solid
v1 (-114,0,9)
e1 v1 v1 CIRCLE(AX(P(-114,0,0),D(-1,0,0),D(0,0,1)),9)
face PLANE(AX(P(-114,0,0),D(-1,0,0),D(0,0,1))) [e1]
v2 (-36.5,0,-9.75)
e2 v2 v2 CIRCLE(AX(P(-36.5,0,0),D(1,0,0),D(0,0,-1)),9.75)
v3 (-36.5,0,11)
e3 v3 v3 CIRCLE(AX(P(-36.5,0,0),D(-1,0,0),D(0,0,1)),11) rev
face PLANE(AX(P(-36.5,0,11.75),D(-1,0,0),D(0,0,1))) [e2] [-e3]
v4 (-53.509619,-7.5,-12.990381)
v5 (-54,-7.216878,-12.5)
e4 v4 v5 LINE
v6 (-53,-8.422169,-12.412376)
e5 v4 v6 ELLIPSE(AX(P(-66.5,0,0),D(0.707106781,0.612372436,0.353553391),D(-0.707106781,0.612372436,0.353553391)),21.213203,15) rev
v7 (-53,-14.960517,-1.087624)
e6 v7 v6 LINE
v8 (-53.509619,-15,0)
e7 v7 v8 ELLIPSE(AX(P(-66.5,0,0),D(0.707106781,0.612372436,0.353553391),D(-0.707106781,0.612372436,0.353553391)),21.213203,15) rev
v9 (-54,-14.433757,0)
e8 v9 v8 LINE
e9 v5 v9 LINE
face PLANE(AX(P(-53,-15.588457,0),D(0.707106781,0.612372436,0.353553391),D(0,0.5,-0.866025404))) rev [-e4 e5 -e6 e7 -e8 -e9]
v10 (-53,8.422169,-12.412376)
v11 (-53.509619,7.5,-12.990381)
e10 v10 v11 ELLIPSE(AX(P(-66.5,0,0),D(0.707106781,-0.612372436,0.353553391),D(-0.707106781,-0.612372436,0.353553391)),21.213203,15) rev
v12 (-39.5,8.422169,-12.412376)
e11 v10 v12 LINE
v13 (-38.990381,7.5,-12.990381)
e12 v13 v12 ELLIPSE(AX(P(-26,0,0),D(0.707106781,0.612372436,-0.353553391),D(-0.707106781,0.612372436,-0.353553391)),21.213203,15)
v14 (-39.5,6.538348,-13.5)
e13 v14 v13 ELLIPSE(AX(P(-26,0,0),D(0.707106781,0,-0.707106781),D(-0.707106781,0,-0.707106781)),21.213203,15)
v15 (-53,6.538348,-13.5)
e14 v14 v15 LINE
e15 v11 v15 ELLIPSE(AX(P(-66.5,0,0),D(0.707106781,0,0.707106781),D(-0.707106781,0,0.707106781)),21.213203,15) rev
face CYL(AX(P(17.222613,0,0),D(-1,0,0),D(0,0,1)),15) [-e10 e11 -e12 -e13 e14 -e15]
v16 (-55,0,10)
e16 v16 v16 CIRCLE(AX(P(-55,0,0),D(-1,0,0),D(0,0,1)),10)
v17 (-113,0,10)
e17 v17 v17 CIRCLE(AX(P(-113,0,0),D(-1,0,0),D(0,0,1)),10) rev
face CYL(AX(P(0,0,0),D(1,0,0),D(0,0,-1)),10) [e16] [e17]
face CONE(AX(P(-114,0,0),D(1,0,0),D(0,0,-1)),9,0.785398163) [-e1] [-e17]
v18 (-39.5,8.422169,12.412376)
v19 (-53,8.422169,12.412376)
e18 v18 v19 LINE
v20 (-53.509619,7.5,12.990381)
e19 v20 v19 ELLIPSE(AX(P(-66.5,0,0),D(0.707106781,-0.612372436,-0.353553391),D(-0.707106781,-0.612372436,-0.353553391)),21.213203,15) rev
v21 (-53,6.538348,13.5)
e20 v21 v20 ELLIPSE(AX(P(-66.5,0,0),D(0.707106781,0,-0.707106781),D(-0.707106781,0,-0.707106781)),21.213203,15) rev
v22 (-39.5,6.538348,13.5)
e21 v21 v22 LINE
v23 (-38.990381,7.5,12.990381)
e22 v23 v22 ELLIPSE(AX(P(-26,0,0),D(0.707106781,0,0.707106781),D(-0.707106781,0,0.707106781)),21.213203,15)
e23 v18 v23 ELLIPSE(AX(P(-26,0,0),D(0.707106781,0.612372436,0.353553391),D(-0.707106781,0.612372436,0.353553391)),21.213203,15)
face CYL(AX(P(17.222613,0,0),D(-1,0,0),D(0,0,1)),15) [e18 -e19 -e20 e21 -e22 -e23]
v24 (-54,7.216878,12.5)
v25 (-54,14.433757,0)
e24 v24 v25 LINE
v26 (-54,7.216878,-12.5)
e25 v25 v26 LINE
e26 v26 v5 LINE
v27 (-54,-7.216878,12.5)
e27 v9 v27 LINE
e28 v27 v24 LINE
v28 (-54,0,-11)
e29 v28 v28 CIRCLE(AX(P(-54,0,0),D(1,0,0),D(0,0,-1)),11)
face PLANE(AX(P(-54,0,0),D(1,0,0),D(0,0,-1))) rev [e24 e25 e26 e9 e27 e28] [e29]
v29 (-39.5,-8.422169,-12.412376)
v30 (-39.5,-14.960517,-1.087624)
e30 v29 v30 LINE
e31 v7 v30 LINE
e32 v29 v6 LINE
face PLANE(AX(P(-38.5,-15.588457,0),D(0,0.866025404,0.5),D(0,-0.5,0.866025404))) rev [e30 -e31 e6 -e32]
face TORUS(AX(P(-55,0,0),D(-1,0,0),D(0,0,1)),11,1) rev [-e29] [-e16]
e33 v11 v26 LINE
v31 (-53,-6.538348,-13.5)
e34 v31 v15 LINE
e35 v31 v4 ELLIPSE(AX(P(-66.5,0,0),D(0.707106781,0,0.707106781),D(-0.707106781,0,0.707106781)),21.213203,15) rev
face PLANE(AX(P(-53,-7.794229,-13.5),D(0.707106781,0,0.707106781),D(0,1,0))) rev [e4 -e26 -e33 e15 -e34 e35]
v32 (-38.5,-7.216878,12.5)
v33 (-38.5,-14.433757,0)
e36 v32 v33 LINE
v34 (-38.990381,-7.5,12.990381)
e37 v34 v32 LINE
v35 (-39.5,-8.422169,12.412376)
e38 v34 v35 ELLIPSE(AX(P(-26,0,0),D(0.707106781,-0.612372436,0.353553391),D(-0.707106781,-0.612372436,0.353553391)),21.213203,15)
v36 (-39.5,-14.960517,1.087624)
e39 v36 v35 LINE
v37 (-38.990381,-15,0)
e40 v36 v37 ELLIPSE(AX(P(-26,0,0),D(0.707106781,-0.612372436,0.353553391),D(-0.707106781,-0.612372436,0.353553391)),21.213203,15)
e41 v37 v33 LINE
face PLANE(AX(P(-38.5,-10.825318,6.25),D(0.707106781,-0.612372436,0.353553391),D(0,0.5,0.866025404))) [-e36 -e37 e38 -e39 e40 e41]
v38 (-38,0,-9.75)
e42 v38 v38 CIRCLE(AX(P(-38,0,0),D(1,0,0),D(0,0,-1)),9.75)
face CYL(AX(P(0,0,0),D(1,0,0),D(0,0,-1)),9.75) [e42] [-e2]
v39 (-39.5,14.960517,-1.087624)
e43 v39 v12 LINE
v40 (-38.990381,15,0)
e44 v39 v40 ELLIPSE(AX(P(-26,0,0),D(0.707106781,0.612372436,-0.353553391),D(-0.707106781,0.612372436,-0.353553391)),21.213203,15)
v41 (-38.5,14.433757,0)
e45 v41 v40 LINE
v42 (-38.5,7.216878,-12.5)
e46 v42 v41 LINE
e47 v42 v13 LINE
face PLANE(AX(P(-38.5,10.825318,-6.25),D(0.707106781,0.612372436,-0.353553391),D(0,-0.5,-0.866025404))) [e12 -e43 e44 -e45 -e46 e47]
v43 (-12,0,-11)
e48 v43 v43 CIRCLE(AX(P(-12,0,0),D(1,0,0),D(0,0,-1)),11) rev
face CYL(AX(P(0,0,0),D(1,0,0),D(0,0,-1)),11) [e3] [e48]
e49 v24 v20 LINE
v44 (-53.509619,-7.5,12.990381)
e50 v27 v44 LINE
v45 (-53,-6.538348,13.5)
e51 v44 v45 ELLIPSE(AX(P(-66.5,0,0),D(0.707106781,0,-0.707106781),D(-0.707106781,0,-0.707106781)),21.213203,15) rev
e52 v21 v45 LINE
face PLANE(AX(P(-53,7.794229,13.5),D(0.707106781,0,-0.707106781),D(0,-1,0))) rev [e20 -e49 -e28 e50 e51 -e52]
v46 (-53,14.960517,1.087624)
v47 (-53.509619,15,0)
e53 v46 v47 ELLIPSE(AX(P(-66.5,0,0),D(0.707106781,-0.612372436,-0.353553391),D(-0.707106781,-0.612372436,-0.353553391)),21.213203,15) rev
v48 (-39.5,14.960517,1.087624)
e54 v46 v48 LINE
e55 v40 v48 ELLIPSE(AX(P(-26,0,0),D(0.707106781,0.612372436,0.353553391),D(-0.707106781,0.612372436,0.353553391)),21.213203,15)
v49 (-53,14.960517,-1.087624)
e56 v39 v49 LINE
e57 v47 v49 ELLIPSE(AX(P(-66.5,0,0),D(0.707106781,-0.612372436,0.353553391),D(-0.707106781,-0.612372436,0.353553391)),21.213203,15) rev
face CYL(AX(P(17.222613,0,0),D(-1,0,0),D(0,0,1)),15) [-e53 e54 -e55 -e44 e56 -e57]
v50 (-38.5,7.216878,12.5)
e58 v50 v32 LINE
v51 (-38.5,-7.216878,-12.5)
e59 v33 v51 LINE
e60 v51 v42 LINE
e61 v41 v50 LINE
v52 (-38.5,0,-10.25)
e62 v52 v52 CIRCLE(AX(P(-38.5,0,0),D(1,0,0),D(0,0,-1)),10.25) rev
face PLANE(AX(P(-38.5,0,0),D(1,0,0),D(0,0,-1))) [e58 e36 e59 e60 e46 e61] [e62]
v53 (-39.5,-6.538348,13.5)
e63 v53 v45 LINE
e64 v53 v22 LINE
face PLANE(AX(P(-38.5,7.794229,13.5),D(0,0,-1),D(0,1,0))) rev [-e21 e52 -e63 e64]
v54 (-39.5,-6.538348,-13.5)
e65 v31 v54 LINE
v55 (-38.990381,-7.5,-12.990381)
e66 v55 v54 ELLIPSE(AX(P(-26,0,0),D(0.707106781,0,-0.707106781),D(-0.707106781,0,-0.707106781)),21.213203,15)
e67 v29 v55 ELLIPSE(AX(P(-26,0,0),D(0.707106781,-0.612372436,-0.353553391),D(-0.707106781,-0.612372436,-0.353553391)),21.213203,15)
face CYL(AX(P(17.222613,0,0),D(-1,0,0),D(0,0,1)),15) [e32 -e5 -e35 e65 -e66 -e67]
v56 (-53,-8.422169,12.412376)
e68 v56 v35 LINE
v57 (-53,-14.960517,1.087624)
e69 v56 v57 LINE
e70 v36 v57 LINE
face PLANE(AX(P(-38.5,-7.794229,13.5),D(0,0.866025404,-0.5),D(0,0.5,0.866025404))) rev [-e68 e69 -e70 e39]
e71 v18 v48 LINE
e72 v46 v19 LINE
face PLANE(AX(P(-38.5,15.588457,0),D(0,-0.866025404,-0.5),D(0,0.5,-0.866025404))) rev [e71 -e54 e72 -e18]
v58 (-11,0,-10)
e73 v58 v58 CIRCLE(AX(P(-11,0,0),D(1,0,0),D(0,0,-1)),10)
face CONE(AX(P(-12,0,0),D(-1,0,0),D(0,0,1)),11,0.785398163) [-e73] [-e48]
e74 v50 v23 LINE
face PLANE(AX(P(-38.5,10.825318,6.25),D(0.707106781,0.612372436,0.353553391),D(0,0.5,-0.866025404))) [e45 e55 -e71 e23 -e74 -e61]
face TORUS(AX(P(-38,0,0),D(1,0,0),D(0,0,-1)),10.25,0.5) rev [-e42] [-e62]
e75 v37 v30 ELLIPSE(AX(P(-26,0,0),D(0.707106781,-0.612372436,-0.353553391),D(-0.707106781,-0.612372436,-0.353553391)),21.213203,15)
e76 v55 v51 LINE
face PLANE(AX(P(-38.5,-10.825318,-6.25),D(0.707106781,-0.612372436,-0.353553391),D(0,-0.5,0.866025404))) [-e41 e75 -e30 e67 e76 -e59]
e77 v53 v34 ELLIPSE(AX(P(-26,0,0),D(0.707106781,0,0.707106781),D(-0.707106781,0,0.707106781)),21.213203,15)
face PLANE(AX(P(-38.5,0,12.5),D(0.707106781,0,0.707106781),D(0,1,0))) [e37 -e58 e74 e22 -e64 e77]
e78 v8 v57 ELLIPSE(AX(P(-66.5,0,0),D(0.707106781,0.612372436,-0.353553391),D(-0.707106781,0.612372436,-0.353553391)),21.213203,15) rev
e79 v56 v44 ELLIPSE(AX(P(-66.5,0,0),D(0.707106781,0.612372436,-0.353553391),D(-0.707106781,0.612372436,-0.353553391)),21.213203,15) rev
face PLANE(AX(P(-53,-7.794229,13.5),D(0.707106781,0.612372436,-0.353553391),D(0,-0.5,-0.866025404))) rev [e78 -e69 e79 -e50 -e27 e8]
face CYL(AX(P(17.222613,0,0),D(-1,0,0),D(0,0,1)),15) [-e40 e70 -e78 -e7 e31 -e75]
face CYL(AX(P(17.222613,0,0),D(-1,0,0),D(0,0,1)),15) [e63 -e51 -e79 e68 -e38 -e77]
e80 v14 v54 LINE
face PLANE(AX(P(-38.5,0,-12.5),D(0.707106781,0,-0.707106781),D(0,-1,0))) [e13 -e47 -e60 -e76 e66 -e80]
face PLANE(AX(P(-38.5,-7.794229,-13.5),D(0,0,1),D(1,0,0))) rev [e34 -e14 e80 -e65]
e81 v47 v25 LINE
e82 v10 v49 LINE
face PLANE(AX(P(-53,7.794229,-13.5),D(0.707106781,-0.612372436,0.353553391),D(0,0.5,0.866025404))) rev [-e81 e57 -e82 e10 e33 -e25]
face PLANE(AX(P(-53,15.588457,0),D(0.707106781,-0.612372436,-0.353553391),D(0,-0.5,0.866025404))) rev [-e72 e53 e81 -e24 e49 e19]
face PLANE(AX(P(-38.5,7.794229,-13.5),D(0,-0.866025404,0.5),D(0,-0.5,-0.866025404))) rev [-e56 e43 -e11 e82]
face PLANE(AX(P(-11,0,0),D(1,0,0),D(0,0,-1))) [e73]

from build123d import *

# Parameters (mm, degrees)
CHAFL_N1_SIZE           = 1
REDONDEO1_R             = 1
CROQUIS2_R              = 21.776851014
CORTAR_EXTRUIR1_DEPTH   = 11
CHAFL_N2_SIZE           = 1
SALIENTE_EXTRUIR1_DEPTH = 15.5
CROQUIS12_W             = 2
CROQUIS12_H             = 2
REDONDEO3_R             = 0.5
SALIENTE_EXTRUIR3_START = 10
CROQUIS15_R             = 10
SALIENTE_EXTRUIR3_DEPTH = 10
CHAFL_N6_SIZE           = 1
CHAFL_N8_SIZE           = 1
CORTAR_EXTRUIR3_START   = -15.009619
CROQUIS17_R             = 19.700918629
CROQUIS17_R_2           = 15
CORTAR_EXTRUIR3_DEPTH   = 14.519238


with BuildPart() as part:
    # Croquis1 → Revolución1 (revolve)
    with BuildSketch(Plane(origin=(0, 0, 0), x_dir=(1, 0, 0), z_dir=(0, 1, 0))):
        Polygon((0, 0), (0, 11), (-50, 11), (-54, 11), (-54, 10), (-104, 10), (-104, 0), align=None)
    revolve(axis=Axis((0, 0, 0), (-1, 0, 0)))

    # Chaflán1
    chafl_n1_edges = [part.edges().sort_by_distance(p)[0] for p in [
        (0, 0, 11),
    ]]
    chamfer(chafl_n1_edges, length=CHAFL_N1_SIZE)

    # Redondeo1
    redondeo1_edges = [part.edges().sort_by_distance(p)[0] for p in [
        (-54, 0, 10),
    ]]
    fillet(redondeo1_edges, radius=REDONDEO1_R - 0.0001)  # a hair under: the kernel refuses the full size

    # Croquis2 → Cortar-Extruir1 (cut)
    with BuildSketch(Plane(origin=(0, 0, 0), x_dir=(0, 0, -1), z_dir=(1, 0, 0))):
        Circle(CROQUIS2_R)
    extrude(amount=-CORTAR_EXTRUIR1_DEPTH, mode=Mode.SUBTRACT)

    # Chaflán2
    chafl_n2_edges = [part.edges().sort_by_distance(p)[0] for p in [
        (-11, 0, 11),
    ]]
    chamfer(chafl_n2_edges, length=CHAFL_N2_SIZE)

    # Croquis10 → Saliente-Extruir1 (add)
    with BuildSketch(Plane(origin=(-54, 0, 0), x_dir=(0, 0, -1), z_dir=(1, 0, 0))):
        Polygon((-13.5, 7.794228634), (-13.5, -7.794228634), (0, -15.588457268), (13.5, -7.794228634), (13.5, 7.794228634), (0, 15.588457268), align=None)
    extrude(amount=SALIENTE_EXTRUIR1_DEPTH)

    # Croquis12 → Cortar-Revolución1 (revolve, cut)
    with BuildSketch(Plane(origin=(0, 0, 0), x_dir=(1, 0, 0), z_dir=(0, 1, 0)), mode=Mode.PRIVATE) as cortar_revoluci_n1_sk:
        with Locations((-37.5, -10.75)):
            Rectangle(CROQUIS12_W, CROQUIS12_H)
    revolve(cortar_revoluci_n1_sk.sketch.rotate(Axis((0, 0, 0), (-1, 0, 0)), 180), axis=Axis((0, 0, 0), (-1, 0, 0)), mode=Mode.SUBTRACT)

    # Redondeo3
    redondeo3_edges = [part.edges().sort_by_distance(p)[0] for p in [
        (-38.5, 0, 9.75),
    ]]
    fillet(redondeo3_edges, radius=REDONDEO3_R)

    # Croquis15 → Saliente-Extruir3 (add)
    with BuildSketch(Plane.ZY.offset(104).offset(SALIENTE_EXTRUIR3_START)):
        Circle(CROQUIS15_R)
    extrude(amount=-SALIENTE_EXTRUIR3_DEPTH)

    # Chaflán6
    chafl_n6_edges = [part.edges().sort_by_distance(p)[0] for p in [
        (-114, 0, -10),
    ]]
    chamfer(chafl_n6_edges, length=CHAFL_N6_SIZE)

    # Chaflán8
    chafl_n8_edges = [part.edges().sort_by_distance(p)[0] for p in [
        (-54, 11.691342951, 6.75),
        (-54, 0, 13.5),
        (-54, -11.691342951, 6.75),
        (-54, -11.691342951, -6.75),
        (-54, 0, -13.5),
        (-54, 11.691342951, -6.75),
        (-38.5, 11.691342951, 6.75),
        (-38.5, 0, 13.5),
        (-38.5, -11.691342951, 6.75),
        (-38.5, -11.691342951, -6.75),
        (-38.5, 0, -13.5),
        (-38.5, 11.691342951, -6.75),
    ]]
    chamfer(chafl_n8_edges, length=CHAFL_N8_SIZE)

    # Croquis17 → Cortar-Extruir3 (cut)
    with BuildSketch(Plane.ZY.offset(54).offset(CORTAR_EXTRUIR3_START)):
        Circle(CROQUIS17_R)
        Circle(CROQUIS17_R_2, mode=Mode.SUBTRACT)
    extrude(amount=CORTAR_EXTRUIR3_DEPTH, mode=Mode.SUBTRACT)


solid = part.part
